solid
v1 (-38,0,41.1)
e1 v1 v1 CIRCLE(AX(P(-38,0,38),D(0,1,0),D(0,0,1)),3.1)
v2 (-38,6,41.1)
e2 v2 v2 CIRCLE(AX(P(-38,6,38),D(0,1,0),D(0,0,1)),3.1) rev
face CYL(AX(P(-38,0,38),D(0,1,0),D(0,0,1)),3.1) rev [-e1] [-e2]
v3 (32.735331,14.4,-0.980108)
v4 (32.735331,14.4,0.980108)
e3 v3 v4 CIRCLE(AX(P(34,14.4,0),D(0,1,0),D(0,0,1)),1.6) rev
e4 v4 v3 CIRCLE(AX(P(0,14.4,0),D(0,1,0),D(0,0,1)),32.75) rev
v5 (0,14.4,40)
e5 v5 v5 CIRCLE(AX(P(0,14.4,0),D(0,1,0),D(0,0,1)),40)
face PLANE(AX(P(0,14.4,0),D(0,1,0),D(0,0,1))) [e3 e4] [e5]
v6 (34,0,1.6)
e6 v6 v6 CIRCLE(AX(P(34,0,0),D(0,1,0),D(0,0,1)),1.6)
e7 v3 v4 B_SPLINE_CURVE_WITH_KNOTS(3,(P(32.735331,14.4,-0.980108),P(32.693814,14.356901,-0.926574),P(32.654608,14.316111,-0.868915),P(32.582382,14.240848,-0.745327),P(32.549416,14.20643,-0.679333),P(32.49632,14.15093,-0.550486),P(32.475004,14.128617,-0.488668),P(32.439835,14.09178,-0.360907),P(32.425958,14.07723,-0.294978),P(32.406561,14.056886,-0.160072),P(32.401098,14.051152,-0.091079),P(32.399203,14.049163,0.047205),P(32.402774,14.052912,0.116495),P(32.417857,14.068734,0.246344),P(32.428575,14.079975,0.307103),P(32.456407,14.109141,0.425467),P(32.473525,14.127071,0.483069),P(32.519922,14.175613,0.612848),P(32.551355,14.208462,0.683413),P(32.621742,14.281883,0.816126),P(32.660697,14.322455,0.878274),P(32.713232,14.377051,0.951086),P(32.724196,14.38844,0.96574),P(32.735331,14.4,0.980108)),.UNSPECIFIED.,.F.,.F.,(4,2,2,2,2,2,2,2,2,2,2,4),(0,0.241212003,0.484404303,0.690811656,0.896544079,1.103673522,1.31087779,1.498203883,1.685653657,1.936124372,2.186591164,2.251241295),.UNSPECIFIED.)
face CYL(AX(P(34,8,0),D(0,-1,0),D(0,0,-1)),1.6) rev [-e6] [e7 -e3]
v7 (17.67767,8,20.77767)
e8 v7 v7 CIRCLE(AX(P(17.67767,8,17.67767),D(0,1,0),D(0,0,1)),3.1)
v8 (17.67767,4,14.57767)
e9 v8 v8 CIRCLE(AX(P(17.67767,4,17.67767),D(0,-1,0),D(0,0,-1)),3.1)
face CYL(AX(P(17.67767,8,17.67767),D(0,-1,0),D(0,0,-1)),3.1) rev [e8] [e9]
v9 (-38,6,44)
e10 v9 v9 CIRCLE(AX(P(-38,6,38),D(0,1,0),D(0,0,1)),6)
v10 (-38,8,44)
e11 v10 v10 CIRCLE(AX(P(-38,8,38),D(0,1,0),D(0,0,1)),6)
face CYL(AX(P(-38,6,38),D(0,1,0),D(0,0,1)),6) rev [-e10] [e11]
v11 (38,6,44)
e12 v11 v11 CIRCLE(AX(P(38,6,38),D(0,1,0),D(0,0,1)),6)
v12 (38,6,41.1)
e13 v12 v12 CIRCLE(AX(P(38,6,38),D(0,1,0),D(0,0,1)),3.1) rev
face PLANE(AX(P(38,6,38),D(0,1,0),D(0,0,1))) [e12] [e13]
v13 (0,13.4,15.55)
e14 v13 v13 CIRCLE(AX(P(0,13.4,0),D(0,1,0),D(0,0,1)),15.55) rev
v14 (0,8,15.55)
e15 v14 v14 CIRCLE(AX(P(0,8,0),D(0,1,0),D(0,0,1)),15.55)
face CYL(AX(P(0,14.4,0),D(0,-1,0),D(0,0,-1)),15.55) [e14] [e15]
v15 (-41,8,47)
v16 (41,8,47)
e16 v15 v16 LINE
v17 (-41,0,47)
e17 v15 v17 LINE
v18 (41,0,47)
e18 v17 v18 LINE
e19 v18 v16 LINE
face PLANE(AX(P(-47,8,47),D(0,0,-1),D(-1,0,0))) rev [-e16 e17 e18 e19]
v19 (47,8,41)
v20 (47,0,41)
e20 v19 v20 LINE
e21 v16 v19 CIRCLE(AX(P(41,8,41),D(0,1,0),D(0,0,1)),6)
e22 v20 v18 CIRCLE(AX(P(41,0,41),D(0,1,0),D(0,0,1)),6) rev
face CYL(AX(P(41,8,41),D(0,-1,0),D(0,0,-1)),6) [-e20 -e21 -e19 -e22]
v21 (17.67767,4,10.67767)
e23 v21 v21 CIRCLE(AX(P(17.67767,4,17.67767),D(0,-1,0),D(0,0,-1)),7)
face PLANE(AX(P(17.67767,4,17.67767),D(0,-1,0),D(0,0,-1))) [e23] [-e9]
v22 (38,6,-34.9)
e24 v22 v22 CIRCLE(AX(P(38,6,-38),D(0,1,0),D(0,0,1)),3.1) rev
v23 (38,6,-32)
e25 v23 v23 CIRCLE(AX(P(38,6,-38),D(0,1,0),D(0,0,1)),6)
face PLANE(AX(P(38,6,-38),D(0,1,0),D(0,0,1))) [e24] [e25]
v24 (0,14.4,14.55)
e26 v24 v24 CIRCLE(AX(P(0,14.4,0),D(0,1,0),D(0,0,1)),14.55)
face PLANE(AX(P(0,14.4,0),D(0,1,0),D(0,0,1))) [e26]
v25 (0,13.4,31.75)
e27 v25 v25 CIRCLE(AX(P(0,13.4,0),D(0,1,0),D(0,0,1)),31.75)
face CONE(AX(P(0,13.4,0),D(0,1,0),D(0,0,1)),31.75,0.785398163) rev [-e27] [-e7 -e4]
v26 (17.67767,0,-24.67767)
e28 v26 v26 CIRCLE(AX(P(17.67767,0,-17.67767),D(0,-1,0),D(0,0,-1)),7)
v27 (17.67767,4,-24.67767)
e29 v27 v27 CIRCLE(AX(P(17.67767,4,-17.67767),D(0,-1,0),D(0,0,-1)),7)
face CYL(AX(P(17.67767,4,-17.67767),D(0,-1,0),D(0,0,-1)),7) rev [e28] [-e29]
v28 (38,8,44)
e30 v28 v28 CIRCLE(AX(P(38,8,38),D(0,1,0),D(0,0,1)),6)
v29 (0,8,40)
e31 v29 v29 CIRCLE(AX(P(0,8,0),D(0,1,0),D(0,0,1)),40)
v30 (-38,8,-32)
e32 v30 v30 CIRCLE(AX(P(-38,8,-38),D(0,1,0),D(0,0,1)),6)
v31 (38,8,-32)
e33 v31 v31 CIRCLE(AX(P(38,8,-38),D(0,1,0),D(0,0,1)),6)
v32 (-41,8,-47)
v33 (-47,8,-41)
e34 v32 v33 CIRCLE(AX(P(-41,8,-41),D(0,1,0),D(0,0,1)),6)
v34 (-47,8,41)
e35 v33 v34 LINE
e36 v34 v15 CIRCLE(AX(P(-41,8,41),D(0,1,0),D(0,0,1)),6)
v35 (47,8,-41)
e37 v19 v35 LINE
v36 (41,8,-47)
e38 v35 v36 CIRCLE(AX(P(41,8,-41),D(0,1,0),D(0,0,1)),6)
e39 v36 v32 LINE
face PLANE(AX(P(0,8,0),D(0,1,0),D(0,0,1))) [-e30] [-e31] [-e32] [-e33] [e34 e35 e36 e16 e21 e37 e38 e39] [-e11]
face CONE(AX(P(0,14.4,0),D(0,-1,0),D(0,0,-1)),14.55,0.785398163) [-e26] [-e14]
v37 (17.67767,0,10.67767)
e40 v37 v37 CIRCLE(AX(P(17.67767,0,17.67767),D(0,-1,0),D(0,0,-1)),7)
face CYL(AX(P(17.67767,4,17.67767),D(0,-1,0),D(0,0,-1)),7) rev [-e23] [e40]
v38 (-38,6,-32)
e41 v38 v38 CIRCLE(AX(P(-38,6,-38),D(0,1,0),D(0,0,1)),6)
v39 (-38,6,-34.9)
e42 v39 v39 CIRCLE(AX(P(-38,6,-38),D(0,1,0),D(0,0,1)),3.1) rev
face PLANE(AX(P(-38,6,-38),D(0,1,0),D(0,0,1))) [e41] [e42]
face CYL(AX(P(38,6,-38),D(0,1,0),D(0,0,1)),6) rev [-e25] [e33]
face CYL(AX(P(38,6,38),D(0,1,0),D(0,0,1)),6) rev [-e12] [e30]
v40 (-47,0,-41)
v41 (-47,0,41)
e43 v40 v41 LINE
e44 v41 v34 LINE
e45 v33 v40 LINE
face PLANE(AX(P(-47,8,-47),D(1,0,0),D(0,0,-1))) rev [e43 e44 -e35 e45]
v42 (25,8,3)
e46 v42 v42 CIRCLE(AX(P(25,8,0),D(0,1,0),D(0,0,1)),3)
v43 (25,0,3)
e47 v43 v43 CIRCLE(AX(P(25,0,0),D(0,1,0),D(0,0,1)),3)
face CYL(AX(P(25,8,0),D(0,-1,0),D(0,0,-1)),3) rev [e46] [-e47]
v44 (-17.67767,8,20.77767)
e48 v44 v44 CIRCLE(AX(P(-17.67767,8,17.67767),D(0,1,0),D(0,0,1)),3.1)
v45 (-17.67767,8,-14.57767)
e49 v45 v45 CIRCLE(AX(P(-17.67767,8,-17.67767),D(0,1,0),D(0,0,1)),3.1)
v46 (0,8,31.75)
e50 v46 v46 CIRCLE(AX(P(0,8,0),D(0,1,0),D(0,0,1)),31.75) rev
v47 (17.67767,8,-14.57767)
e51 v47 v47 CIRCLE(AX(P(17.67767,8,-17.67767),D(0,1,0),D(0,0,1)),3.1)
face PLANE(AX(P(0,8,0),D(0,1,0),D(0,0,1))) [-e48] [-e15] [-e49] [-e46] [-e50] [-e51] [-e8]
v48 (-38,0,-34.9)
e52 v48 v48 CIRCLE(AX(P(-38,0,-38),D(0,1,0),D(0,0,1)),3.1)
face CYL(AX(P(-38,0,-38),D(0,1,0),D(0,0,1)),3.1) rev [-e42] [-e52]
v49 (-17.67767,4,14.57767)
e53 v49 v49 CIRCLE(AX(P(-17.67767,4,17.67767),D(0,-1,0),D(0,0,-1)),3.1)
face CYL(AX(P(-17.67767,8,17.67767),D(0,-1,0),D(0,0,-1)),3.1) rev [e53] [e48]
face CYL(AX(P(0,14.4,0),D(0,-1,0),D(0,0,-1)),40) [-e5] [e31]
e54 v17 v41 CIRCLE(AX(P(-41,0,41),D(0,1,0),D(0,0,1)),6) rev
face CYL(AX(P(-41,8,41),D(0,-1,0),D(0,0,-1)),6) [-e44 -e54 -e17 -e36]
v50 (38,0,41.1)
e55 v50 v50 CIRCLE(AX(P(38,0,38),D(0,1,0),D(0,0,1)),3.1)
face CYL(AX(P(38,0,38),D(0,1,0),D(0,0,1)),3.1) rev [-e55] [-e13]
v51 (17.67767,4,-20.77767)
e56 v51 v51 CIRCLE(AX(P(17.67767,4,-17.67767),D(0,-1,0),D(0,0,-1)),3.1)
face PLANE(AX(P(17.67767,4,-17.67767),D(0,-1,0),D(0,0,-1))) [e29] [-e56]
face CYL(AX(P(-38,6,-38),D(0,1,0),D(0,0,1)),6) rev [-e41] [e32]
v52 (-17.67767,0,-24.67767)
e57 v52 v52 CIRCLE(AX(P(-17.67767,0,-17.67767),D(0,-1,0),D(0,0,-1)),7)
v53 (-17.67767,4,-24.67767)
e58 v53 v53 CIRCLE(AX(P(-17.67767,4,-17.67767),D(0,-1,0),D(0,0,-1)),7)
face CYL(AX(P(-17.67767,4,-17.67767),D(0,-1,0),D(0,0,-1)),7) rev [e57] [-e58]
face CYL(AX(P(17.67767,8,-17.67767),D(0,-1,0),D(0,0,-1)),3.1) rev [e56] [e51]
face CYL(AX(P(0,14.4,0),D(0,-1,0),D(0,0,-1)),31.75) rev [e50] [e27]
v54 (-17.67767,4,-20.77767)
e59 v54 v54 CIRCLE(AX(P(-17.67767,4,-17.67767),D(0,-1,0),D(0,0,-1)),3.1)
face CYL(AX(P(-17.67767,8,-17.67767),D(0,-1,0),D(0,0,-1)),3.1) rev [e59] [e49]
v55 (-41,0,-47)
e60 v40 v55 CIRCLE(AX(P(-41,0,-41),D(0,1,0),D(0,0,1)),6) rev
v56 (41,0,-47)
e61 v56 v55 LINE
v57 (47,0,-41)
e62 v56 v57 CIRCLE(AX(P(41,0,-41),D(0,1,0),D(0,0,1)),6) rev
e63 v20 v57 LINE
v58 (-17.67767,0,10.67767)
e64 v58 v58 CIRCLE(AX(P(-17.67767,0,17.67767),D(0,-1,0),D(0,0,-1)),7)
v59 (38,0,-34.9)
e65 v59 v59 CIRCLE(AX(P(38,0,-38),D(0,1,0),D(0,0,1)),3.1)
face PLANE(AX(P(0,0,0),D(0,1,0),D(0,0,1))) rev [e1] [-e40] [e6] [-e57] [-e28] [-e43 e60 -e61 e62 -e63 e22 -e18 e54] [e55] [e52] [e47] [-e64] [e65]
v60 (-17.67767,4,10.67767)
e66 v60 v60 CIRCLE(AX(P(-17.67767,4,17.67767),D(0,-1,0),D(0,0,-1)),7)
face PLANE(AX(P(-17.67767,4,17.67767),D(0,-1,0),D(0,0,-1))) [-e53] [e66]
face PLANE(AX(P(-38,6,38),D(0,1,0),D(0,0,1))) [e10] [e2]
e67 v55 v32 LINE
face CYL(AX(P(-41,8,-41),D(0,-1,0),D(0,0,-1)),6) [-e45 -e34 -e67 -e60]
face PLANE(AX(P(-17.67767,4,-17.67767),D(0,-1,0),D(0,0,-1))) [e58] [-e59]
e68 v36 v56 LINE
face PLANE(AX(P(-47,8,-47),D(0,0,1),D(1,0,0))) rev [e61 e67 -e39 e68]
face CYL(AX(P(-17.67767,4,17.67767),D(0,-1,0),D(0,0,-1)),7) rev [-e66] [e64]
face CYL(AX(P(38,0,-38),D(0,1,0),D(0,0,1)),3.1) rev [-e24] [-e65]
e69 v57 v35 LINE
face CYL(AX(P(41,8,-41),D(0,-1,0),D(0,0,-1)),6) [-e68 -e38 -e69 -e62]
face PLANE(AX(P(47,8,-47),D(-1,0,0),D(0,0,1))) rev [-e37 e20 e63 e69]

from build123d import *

# Parameters (mm, degrees)
SKETCH1_W           = 94
SKETCH1_H           = 94
SKETCH1_R           = 1.6
SKETCH1_R_2         = 3.1
SKETCH1_R_3         = 3
BOSS_EXTRUDE1_DEPTH = 8
SKETCH2_R           = 7
CUT_EXTRUDE1_DEPTH  = 4
SKETCH3_R           = 40
SKETCH3_R_2         = 1.6
SKETCH3_R_3         = 31.75
SKETCH3_R_4         = 15.55
BOSS_EXTRUDE2_DEPTH = 6.4
CHAMFER1_SIZE       = 1
FILLET1_R           = 6
SKETCH5_R           = 3.1
CUT_EXTRUDE2_DEPTH  = 67.947740825
SKETCH6_R           = 6
CUT_EXTRUDE3_DEPTH  = 2


with BuildPart() as part:
    # Sketch1 → Boss-Extrude1 (new body)
    with BuildSketch(Plane(origin=(0, 0, 0), x_dir=(1, 0, 0), z_dir=(0, 1, 0))):
        Rectangle(SKETCH1_W, SKETCH1_H)
        with Locations(Location((34, 0, 0), (0, 0, 270))):
            Circle(SKETCH1_R, mode=Mode.SUBTRACT)
        with Locations(Location((17.67766953, -17.67766953, 0), (0, 0, 270))):
            Circle(SKETCH1_R_2, mode=Mode.SUBTRACT)
        with Locations(Location((25, 0, 0), (0, 0, 270))):
            Circle(SKETCH1_R_3, mode=Mode.SUBTRACT)
        with Locations(Location((-17.67766953, -17.67766953, 0), (0, 0, 270))):
            Circle(SKETCH1_R_2, mode=Mode.SUBTRACT)
        with Locations(Location((-17.67766953, 17.67766953, 0), (0, 0, 270))):
            Circle(SKETCH1_R_2, mode=Mode.SUBTRACT)
        with Locations(Location((17.67766953, 17.67766953, 0), (0, 0, 270))):
            Circle(SKETCH1_R_2, mode=Mode.SUBTRACT)
    extrude(amount=BOSS_EXTRUDE1_DEPTH)

    # Sketch2 → Cut-Extrude1 (cut)
    with BuildSketch(Plane.XZ):
        with Locations(Location((17.67766953, 17.67766953, 0), (0, 0, 270))):
            Circle(SKETCH2_R)
        with Locations(Location((17.67766953, -17.67766953, 0), (0, 0, 270))):
            Circle(SKETCH2_R)
        with Locations(Location((-17.67766953, -17.67766953, 0), (0, 0, 270))):
            Circle(SKETCH2_R)
        with Locations(Location((-17.67766953, 17.67766953, 0), (0, 0, 270))):
            Circle(SKETCH2_R)
    extrude(amount=-CUT_EXTRUDE1_DEPTH, mode=Mode.SUBTRACT)

    # Sketch3 → Boss-Extrude2 (add)
    # profile 1 of 2: a face of its own
    with BuildSketch(Plane(origin=(0, 8, 0), x_dir=(1, 0, 0), z_dir=(0, 1, 0))):
        with Locations(Location((0, 0, 0), (0, 0, 270))):
            Circle(SKETCH3_R)
        with Locations(Location((34, 0, 0), (0, 0, 270))):
            Circle(SKETCH3_R_2, mode=Mode.SUBTRACT)
        with Locations(Location((0, 0, 0), (0, 0, 270))):
            Circle(SKETCH3_R_3, mode=Mode.SUBTRACT)
    # profile 2 of 2: a face of its own
    with BuildSketch(Plane(origin=(0, 8, 0), x_dir=(1, 0, 0), z_dir=(0, 1, 0))):
        with Locations(Location((0, 0, 0), (0, 0, 270))):
            Circle(SKETCH3_R_4)
    extrude(amount=BOSS_EXTRUDE2_DEPTH)

    # Chamfer1
    # the kernel refuses this chamfer: 1 mm, written as the material it takes off along each edge
    with BuildSketch(Plane(origin=(0, 14.4, 0), x_dir=(0, 0, 1), z_dir=(-1, 0, 0))) as chamfer1_piece_1:
        Polygon((15.55, -CHAMFER1_SIZE), (15.55 - CHAMFER1_SIZE, 0), (15.55, 0), align=None)
    revolve(axis=Axis((0, 14.4, 0), (0, 1, 0)), mode=Mode.SUBTRACT)
    with BuildSketch(Plane(origin=(0, 14.4, 0), x_dir=(0, 0, 1), z_dir=(-1, 0, 0))) as chamfer1_piece_2:
        Polygon((31.75 + CHAMFER1_SIZE, 0), (31.75, -CHAMFER1_SIZE), (31.75, 0), align=None)
    revolve(axis=Axis((0, 14.4, 0), (0, 1, 0)), mode=Mode.SUBTRACT)

    # Fillet1
    fillet1_edges = [part.edges().sort_by_distance(p)[0] for p in [
        (47, 4, 47),
        (-47, 4, 47),
        (-47, 4, -47),
        (47, 4, -47),
    ]]
    fillet(fillet1_edges, radius=FILLET1_R)

    # Sketch5 → Cut-Extrude2 (cut, through all)
    with BuildSketch(Plane(origin=(0, 8, 0), x_dir=(1, 0, 0), z_dir=(0, 1, 0))):
        with Locations(Location((-38, 38, 0), (0, 0, 270))):
            Circle(SKETCH5_R)
        with Locations(Location((38, 38, 0), (0, 0, 270))):
            Circle(SKETCH5_R)
        with Locations(Location((38, -38, 0), (0, 0, 270))):
            Circle(SKETCH5_R)
        with Locations(Location((-38, -38, 0), (0, 0, 270))):
            Circle(SKETCH5_R)
    extrude(amount=-CUT_EXTRUDE2_DEPTH, mode=Mode.SUBTRACT)

    # Sketch6 → Cut-Extrude3 (cut)
    with BuildSketch(Plane(origin=(0, 8, 0), x_dir=(1, 0, 0), z_dir=(0, 1, 0))):
        with Locations(Location((-38, 38, 0), (0, 0, 270))):
            Circle(SKETCH6_R)
        with Locations(Location((38, 38, 0), (0, 0, 270))):
            Circle(SKETCH6_R)
        with Locations(Location((38, -38, 0), (0, 0, 270))):
            Circle(SKETCH6_R)
        with Locations(Location((-38, -38, 0), (0, 0, 270))):
            Circle(SKETCH6_R)
    extrude(amount=-CUT_EXTRUDE3_DEPTH, mode=Mode.SUBTRACT)


solid = part.part
